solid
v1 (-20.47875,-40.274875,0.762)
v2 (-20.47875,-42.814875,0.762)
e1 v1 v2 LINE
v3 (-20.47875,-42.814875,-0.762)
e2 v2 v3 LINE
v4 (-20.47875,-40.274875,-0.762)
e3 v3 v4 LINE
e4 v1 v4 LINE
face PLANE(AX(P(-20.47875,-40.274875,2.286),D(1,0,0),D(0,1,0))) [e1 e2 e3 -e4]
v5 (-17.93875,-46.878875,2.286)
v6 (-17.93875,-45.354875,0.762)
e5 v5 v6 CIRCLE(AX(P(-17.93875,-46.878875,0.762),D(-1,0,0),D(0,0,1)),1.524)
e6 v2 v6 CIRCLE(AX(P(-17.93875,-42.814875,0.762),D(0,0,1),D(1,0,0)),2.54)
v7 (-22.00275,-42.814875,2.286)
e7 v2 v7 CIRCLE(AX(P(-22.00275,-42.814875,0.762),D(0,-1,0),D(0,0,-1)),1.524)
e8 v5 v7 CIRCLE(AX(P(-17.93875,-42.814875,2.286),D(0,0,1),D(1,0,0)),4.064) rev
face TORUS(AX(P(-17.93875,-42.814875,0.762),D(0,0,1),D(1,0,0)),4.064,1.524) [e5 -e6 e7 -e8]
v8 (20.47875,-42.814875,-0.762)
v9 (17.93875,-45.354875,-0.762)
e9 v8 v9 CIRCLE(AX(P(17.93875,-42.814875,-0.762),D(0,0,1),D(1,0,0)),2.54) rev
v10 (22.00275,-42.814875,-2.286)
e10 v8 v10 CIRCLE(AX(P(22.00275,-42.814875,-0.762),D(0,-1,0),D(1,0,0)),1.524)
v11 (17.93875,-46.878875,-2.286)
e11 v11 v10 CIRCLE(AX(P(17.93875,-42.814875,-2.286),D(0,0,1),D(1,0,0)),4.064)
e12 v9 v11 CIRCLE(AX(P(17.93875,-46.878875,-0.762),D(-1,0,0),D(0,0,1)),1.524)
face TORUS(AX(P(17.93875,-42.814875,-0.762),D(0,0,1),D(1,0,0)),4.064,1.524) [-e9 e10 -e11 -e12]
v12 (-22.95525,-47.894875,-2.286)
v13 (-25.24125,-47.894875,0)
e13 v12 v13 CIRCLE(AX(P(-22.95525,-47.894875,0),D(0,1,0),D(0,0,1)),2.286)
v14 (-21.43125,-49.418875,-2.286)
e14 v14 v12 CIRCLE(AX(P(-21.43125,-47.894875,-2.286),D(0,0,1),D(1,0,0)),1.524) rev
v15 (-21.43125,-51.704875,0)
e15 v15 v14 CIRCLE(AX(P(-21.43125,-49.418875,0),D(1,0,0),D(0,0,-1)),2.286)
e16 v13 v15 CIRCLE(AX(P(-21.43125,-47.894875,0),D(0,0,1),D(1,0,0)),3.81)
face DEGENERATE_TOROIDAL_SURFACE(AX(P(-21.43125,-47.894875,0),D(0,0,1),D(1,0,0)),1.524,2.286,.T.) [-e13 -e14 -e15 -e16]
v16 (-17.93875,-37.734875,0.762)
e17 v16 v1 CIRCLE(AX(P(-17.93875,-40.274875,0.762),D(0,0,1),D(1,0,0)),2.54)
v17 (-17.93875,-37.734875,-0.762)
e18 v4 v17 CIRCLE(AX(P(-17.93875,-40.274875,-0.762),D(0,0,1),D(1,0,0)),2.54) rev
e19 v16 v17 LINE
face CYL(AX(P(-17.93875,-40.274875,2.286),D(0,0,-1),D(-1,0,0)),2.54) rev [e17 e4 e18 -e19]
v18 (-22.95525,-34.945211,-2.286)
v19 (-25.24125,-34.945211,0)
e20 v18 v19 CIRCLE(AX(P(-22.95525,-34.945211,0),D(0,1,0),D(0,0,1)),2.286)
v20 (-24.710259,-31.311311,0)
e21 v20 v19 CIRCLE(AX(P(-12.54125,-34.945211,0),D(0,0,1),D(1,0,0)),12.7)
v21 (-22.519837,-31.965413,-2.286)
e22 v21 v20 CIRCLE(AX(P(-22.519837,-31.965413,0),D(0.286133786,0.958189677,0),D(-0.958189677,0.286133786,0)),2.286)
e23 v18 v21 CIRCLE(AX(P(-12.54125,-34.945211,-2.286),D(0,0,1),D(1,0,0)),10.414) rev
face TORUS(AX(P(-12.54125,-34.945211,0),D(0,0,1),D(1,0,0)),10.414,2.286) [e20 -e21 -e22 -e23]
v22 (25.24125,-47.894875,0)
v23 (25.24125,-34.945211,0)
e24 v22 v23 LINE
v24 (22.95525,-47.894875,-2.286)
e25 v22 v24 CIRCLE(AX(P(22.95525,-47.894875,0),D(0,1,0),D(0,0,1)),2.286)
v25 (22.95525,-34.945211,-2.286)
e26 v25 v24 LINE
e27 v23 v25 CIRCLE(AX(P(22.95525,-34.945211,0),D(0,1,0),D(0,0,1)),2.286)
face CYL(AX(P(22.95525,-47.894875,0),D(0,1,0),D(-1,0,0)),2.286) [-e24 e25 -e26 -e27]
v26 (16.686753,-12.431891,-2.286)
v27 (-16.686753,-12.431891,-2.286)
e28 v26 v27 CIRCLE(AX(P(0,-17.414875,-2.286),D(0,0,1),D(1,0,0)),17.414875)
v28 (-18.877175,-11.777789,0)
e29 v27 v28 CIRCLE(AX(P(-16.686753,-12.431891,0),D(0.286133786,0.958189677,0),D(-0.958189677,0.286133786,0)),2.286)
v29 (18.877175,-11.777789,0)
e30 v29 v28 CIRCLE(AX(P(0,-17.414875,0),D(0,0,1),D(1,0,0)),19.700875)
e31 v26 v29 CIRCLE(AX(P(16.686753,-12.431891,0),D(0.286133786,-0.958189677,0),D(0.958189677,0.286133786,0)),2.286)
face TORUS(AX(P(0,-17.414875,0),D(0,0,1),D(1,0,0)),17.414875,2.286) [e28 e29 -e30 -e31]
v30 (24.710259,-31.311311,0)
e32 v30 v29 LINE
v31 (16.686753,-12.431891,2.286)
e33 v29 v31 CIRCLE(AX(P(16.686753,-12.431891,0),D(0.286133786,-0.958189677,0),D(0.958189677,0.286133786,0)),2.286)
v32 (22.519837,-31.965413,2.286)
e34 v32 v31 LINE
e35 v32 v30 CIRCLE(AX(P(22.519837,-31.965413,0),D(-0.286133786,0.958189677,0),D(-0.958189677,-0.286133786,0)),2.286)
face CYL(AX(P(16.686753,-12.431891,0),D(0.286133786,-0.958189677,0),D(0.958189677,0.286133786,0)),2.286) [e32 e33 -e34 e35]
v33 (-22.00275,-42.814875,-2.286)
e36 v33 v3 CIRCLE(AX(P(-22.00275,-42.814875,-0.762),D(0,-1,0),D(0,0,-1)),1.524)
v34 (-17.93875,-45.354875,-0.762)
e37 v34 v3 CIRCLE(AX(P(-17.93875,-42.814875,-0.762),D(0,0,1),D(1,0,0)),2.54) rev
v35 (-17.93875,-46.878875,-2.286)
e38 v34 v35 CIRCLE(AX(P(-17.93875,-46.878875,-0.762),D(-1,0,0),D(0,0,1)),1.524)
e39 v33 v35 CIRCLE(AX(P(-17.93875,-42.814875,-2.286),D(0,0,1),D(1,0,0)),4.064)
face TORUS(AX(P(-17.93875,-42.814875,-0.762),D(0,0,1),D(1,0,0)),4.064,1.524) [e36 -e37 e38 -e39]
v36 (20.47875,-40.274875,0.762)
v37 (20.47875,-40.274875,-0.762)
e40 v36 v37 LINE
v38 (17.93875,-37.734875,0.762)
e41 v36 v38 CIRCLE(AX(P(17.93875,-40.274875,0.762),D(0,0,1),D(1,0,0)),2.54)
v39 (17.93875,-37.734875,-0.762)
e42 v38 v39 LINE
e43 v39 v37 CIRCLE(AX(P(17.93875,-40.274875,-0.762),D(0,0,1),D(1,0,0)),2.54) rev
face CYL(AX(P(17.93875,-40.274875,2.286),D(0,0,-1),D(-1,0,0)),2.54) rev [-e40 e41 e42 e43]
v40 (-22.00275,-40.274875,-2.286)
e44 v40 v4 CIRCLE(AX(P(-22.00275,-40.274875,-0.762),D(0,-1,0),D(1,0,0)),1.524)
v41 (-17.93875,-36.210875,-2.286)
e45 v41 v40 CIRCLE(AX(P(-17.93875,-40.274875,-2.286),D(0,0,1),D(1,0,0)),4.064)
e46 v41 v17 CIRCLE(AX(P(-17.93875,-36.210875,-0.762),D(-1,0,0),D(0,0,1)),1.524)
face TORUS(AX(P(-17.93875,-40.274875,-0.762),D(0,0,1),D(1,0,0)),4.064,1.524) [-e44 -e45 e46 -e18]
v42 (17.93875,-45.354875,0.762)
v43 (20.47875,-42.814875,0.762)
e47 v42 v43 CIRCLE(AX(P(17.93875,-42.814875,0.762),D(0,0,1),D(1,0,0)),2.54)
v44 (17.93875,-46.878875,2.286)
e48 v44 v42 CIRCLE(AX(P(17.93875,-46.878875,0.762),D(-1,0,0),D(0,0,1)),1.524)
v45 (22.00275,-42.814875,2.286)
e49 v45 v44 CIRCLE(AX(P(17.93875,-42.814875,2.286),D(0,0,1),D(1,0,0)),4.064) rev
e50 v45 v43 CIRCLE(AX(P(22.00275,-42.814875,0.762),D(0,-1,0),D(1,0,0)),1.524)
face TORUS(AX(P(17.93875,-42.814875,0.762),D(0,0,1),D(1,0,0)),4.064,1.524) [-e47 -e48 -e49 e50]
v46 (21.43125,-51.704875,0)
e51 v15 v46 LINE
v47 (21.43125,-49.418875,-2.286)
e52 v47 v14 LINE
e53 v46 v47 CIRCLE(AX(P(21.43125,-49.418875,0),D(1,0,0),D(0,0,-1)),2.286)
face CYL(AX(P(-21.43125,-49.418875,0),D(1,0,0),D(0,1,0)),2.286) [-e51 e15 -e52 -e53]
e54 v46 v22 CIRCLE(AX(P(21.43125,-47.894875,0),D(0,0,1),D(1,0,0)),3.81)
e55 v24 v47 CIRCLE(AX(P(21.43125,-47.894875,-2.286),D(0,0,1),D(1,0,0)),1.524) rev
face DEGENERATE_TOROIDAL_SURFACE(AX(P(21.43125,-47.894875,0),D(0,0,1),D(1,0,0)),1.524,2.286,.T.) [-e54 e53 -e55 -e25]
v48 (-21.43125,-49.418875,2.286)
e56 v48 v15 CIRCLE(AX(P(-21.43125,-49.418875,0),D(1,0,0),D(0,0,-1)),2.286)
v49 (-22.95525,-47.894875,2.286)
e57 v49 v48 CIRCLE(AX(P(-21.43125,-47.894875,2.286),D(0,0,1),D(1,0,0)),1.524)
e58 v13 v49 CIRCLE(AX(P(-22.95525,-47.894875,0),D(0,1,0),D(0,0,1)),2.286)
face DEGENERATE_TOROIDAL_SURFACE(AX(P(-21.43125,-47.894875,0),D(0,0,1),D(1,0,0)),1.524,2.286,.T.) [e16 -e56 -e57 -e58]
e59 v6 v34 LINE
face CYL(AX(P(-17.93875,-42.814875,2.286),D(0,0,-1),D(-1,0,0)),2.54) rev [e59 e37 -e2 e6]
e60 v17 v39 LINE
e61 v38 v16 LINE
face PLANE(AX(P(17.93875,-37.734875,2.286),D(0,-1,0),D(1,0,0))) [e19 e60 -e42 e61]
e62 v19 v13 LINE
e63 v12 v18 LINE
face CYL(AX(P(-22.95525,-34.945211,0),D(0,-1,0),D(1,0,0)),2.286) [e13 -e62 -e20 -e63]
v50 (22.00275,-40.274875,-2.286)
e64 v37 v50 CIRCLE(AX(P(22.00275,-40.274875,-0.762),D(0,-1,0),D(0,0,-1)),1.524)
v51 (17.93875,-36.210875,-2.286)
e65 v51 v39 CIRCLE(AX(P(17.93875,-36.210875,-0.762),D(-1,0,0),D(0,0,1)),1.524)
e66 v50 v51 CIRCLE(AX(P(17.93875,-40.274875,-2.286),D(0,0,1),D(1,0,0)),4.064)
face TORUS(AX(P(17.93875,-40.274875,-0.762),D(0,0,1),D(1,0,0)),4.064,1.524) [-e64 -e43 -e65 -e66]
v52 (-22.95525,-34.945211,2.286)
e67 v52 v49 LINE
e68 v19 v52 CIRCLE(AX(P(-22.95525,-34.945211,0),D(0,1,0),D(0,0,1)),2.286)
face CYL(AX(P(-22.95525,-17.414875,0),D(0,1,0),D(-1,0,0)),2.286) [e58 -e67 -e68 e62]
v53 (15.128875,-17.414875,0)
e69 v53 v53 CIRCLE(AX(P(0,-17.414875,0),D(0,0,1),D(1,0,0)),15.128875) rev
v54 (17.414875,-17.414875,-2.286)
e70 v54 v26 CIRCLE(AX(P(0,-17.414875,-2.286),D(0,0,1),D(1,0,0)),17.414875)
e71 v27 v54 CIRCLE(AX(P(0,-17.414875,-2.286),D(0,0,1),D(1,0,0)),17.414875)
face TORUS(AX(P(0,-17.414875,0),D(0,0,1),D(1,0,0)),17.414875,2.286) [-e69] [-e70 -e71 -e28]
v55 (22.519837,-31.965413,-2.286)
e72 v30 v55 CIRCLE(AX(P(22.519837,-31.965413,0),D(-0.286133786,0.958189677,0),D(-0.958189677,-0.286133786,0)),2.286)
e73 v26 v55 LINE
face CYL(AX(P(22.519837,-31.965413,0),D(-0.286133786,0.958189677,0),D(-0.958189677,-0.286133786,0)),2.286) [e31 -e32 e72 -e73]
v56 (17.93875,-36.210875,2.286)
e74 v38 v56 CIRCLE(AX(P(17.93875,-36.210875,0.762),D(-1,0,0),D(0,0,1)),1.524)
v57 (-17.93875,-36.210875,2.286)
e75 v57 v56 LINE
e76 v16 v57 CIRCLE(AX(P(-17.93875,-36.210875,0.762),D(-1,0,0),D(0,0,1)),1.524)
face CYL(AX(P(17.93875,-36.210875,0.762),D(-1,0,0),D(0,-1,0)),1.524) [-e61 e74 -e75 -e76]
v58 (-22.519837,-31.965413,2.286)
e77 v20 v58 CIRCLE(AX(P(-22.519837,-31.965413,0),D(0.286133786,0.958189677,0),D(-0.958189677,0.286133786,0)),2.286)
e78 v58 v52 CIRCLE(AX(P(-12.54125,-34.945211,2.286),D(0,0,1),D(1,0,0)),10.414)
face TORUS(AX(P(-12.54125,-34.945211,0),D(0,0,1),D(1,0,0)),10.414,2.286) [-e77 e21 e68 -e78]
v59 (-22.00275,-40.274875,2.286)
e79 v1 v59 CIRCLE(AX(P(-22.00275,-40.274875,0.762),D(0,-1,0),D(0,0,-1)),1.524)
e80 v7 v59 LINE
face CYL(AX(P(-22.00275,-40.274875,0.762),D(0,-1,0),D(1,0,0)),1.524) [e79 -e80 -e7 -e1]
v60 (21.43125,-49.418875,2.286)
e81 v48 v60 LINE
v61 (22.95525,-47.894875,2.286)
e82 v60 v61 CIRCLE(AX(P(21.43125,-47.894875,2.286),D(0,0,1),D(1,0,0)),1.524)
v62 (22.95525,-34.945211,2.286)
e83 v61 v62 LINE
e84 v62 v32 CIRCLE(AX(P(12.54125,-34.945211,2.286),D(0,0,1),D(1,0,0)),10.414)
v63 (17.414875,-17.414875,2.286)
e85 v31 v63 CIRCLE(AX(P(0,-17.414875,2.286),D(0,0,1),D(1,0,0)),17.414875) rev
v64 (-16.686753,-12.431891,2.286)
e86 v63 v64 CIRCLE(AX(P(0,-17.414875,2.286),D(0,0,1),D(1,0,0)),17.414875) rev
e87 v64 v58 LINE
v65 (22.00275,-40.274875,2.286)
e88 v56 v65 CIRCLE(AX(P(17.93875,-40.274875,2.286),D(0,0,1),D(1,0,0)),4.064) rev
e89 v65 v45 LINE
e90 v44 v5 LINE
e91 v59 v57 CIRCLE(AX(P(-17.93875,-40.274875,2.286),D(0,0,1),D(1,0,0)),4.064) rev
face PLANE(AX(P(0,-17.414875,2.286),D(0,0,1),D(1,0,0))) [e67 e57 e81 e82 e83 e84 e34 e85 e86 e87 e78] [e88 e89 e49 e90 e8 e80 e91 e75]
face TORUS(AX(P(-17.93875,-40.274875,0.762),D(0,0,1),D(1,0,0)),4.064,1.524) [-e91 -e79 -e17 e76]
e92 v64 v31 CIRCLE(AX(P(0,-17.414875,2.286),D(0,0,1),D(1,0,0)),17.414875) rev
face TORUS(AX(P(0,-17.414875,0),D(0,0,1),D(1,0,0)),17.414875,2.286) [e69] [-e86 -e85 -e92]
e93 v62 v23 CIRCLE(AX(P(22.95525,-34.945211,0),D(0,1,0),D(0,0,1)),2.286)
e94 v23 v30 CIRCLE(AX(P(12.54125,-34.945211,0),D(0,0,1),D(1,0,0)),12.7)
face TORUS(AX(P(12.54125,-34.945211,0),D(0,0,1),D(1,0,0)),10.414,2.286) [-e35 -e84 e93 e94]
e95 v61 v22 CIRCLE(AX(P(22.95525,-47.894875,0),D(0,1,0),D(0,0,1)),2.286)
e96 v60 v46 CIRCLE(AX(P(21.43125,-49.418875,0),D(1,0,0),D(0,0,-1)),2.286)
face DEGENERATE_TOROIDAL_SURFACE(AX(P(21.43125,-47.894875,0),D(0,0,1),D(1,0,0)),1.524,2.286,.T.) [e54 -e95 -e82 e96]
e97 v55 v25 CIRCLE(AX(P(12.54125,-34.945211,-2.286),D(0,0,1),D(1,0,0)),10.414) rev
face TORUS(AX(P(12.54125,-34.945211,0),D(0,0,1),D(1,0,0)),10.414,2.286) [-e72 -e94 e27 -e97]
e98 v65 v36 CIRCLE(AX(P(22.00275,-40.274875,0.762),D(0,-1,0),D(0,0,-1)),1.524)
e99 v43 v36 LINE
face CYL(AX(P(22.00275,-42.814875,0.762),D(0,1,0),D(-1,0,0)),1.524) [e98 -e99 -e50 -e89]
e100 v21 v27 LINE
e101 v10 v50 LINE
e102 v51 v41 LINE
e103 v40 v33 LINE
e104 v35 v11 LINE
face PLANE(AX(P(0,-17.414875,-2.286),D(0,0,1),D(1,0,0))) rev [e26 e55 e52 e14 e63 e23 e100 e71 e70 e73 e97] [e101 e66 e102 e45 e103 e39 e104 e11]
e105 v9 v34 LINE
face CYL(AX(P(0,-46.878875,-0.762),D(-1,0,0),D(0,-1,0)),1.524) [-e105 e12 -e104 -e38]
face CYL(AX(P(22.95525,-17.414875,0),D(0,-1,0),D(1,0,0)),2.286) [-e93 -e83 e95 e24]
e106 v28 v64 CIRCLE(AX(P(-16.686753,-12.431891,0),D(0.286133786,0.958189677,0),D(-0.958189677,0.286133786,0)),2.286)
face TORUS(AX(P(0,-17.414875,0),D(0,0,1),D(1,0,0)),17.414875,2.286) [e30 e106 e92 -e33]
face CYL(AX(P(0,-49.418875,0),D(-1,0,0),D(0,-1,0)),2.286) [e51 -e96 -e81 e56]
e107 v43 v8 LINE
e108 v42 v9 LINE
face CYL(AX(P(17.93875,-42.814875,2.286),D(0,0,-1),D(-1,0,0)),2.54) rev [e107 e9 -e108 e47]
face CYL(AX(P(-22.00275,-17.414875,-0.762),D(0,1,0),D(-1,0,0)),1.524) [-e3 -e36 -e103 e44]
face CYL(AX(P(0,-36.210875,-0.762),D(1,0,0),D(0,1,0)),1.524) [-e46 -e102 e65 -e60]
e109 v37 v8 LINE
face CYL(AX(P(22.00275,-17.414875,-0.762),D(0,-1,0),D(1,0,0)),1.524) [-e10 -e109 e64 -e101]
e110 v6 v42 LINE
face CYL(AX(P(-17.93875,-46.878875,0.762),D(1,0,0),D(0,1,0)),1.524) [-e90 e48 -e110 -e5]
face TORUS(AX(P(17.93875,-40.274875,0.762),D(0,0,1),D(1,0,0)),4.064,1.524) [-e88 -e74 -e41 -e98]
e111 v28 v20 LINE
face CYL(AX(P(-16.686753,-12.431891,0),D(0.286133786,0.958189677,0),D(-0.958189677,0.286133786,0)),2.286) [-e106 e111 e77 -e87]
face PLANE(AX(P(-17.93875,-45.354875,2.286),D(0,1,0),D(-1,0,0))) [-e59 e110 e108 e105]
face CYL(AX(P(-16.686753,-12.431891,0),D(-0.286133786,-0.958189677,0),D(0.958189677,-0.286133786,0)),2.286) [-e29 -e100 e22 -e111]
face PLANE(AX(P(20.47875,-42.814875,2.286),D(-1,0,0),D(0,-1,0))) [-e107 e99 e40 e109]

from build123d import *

# Parameters (mm, degrees)
SKETCH2_R                = 2.286
BOSS_EXTRUDE1_DEPTH      = 2.286
BOSS_EXTRUDE1_DEPTH_BACK = 2.286
SKETCH4_R                = 15.128875
FILLET1_R                = 2.286
FILLET2_R                = 1.524


with BuildPart() as part:
    # Sweep1: sweep along a path in Sketch3
    with BuildLine(Plane.XY) as sweep1_path:
        CenterArc((0, -17.414875), 17.414875, 0, 360)
    # Sketch2 → Sweep1 (sweep)
    with BuildSketch(Plane(origin=(0, 0, 0), x_dir=(0, 0, -1), z_dir=(1, 0, 0))):
        Circle(SKETCH2_R)
    sweep(path=sweep1_path.line)

    # Sketch4 → Boss-Extrude1 (add, two sides: drawn at the far end of the back side and taken through both)
    with BuildSketch(Plane.XY.offset(-BOSS_EXTRUDE1_DEPTH_BACK)):
        with BuildLine():
            Line((-18.877175048, -11.777789051), (-24.710258894, -31.311311487))
            ThreePointArc((-24.710258894, -31.311311487), (-25.107801097, -33.108966161), (-25.24125, -34.945210567))
            Line((-25.24125, -34.945210567), (-25.24125, -47.894875))
            ThreePointArc((-25.24125, -47.894875), (-24.125326836, -50.588951836), (-21.43125, -51.704875))
            Line((-21.43125, -51.704875), (21.43125, -51.704875))
            ThreePointArc((21.43125, -51.704875), (24.125326836, -50.588951836), (25.24125, -47.894875))
            Line((25.24125, -47.894875), (25.24125, -34.945210567))
            ThreePointArc((25.24125, -34.945210567), (25.107801097, -33.108966161), (24.710258894, -31.311311487))
            Line((24.710258894, -31.311311487), (18.877175048, -11.777789051))
            ThreePointArc((18.877175048, -11.777789051), (0, 2.286), (-18.877175048, -11.777789051))
        make_face()
        with Locations((0, -17.414875)):
            Circle(SKETCH4_R, mode=Mode.SUBTRACT)
        with BuildLine():
            Line((-20.47875, -40.274875), (-20.47875, -42.814875))
            ThreePointArc((-20.47875, -42.814875), (-19.734801224, -44.610926224), (-17.93875, -45.354875))
            Line((-17.93875, -45.354875), (17.93875, -45.354875))
            ThreePointArc((17.93875, -45.354875), (19.734801224, -44.610926224), (20.47875, -42.814875))
            Line((20.47875, -42.814875), (20.47875, -40.274875))
            ThreePointArc((20.47875, -40.274875), (19.734801224, -38.478823776), (17.93875, -37.734875))
            Line((17.93875, -37.734875), (-17.93875, -37.734875))
            ThreePointArc((-17.93875, -37.734875), (-19.734801224, -38.478823776), (-20.47875, -40.274875))
        make_face(mode=Mode.SUBTRACT)
    extrude(amount=BOSS_EXTRUDE1_DEPTH + BOSS_EXTRUDE1_DEPTH_BACK)

    # Fillet1
    fillet1_edges = [part.edges().sort_by_distance(p)[0] for p in [
        (21.793716971, -21.544550269, 2.286),
        (25.107801097, -33.108966161, 2.286),
        (25.24125, -41.420042784, 2.286),
        (24.125326836, -50.588951836, 2.286),
        (0, -51.704875, 2.286),
        (-24.125326836, -50.588951836, 2.286),
        (-25.24125, -41.420042784, 2.286),
        (-25.107801097, -33.108966161, 2.286),
        (-21.793716971, -21.544550269, 2.286),
        (21.793716971, -21.544550269, -2.286),
        (25.107801097, -33.108966161, -2.286),
        (25.24125, -41.420042784, -2.286),
        (24.125326836, -50.588951836, -2.286),
        (0, -51.704875, -2.286),
        (-24.125326836, -50.588951836, -2.286),
        (-25.24125, -41.420042784, -2.286),
        (-25.107801097, -33.108966161, -2.286),
        (-21.793716971, -21.544550269, -2.286),
        (-15.128875, -17.414875, 2.286),
        (-15.128875, -17.414875, -2.286),
        (0, 2.286, 2.286),
        (0, 2.286, -2.286),
    ]]
    fillet(fillet1_edges, radius=FILLET1_R - 0.0001)  # a hair under: the kernel refuses the full size

    # Fillet2
    fillet2_edges = [part.edges().sort_by_distance(p)[0] for p in [
        (19.734801224, -38.478823776, 2.286),
        (0, -37.734875, 2.286),
        (-19.734801224, -38.478823776, 2.286),
        (-20.47875, -41.544875, 2.286),
        (-19.734801224, -44.610926224, 2.286),
        (0, -45.354875, 2.286),
        (19.734801224, -44.610926224, 2.286),
        (20.47875, -41.544875, 2.286),
        (20.47875, -41.544875, -2.286),
        (19.734801224, -38.478823776, -2.286),
        (0, -37.734875, -2.286),
        (-19.734801224, -38.478823776, -2.286),
        (-20.47875, -41.544875, -2.286),
        (-19.734801224, -44.610926224, -2.286),
        (0, -45.354875, -2.286),
        (19.734801224, -44.610926224, -2.286),
    ]]
    fillet(fillet2_edges, radius=FILLET2_R)


solid = part.part
